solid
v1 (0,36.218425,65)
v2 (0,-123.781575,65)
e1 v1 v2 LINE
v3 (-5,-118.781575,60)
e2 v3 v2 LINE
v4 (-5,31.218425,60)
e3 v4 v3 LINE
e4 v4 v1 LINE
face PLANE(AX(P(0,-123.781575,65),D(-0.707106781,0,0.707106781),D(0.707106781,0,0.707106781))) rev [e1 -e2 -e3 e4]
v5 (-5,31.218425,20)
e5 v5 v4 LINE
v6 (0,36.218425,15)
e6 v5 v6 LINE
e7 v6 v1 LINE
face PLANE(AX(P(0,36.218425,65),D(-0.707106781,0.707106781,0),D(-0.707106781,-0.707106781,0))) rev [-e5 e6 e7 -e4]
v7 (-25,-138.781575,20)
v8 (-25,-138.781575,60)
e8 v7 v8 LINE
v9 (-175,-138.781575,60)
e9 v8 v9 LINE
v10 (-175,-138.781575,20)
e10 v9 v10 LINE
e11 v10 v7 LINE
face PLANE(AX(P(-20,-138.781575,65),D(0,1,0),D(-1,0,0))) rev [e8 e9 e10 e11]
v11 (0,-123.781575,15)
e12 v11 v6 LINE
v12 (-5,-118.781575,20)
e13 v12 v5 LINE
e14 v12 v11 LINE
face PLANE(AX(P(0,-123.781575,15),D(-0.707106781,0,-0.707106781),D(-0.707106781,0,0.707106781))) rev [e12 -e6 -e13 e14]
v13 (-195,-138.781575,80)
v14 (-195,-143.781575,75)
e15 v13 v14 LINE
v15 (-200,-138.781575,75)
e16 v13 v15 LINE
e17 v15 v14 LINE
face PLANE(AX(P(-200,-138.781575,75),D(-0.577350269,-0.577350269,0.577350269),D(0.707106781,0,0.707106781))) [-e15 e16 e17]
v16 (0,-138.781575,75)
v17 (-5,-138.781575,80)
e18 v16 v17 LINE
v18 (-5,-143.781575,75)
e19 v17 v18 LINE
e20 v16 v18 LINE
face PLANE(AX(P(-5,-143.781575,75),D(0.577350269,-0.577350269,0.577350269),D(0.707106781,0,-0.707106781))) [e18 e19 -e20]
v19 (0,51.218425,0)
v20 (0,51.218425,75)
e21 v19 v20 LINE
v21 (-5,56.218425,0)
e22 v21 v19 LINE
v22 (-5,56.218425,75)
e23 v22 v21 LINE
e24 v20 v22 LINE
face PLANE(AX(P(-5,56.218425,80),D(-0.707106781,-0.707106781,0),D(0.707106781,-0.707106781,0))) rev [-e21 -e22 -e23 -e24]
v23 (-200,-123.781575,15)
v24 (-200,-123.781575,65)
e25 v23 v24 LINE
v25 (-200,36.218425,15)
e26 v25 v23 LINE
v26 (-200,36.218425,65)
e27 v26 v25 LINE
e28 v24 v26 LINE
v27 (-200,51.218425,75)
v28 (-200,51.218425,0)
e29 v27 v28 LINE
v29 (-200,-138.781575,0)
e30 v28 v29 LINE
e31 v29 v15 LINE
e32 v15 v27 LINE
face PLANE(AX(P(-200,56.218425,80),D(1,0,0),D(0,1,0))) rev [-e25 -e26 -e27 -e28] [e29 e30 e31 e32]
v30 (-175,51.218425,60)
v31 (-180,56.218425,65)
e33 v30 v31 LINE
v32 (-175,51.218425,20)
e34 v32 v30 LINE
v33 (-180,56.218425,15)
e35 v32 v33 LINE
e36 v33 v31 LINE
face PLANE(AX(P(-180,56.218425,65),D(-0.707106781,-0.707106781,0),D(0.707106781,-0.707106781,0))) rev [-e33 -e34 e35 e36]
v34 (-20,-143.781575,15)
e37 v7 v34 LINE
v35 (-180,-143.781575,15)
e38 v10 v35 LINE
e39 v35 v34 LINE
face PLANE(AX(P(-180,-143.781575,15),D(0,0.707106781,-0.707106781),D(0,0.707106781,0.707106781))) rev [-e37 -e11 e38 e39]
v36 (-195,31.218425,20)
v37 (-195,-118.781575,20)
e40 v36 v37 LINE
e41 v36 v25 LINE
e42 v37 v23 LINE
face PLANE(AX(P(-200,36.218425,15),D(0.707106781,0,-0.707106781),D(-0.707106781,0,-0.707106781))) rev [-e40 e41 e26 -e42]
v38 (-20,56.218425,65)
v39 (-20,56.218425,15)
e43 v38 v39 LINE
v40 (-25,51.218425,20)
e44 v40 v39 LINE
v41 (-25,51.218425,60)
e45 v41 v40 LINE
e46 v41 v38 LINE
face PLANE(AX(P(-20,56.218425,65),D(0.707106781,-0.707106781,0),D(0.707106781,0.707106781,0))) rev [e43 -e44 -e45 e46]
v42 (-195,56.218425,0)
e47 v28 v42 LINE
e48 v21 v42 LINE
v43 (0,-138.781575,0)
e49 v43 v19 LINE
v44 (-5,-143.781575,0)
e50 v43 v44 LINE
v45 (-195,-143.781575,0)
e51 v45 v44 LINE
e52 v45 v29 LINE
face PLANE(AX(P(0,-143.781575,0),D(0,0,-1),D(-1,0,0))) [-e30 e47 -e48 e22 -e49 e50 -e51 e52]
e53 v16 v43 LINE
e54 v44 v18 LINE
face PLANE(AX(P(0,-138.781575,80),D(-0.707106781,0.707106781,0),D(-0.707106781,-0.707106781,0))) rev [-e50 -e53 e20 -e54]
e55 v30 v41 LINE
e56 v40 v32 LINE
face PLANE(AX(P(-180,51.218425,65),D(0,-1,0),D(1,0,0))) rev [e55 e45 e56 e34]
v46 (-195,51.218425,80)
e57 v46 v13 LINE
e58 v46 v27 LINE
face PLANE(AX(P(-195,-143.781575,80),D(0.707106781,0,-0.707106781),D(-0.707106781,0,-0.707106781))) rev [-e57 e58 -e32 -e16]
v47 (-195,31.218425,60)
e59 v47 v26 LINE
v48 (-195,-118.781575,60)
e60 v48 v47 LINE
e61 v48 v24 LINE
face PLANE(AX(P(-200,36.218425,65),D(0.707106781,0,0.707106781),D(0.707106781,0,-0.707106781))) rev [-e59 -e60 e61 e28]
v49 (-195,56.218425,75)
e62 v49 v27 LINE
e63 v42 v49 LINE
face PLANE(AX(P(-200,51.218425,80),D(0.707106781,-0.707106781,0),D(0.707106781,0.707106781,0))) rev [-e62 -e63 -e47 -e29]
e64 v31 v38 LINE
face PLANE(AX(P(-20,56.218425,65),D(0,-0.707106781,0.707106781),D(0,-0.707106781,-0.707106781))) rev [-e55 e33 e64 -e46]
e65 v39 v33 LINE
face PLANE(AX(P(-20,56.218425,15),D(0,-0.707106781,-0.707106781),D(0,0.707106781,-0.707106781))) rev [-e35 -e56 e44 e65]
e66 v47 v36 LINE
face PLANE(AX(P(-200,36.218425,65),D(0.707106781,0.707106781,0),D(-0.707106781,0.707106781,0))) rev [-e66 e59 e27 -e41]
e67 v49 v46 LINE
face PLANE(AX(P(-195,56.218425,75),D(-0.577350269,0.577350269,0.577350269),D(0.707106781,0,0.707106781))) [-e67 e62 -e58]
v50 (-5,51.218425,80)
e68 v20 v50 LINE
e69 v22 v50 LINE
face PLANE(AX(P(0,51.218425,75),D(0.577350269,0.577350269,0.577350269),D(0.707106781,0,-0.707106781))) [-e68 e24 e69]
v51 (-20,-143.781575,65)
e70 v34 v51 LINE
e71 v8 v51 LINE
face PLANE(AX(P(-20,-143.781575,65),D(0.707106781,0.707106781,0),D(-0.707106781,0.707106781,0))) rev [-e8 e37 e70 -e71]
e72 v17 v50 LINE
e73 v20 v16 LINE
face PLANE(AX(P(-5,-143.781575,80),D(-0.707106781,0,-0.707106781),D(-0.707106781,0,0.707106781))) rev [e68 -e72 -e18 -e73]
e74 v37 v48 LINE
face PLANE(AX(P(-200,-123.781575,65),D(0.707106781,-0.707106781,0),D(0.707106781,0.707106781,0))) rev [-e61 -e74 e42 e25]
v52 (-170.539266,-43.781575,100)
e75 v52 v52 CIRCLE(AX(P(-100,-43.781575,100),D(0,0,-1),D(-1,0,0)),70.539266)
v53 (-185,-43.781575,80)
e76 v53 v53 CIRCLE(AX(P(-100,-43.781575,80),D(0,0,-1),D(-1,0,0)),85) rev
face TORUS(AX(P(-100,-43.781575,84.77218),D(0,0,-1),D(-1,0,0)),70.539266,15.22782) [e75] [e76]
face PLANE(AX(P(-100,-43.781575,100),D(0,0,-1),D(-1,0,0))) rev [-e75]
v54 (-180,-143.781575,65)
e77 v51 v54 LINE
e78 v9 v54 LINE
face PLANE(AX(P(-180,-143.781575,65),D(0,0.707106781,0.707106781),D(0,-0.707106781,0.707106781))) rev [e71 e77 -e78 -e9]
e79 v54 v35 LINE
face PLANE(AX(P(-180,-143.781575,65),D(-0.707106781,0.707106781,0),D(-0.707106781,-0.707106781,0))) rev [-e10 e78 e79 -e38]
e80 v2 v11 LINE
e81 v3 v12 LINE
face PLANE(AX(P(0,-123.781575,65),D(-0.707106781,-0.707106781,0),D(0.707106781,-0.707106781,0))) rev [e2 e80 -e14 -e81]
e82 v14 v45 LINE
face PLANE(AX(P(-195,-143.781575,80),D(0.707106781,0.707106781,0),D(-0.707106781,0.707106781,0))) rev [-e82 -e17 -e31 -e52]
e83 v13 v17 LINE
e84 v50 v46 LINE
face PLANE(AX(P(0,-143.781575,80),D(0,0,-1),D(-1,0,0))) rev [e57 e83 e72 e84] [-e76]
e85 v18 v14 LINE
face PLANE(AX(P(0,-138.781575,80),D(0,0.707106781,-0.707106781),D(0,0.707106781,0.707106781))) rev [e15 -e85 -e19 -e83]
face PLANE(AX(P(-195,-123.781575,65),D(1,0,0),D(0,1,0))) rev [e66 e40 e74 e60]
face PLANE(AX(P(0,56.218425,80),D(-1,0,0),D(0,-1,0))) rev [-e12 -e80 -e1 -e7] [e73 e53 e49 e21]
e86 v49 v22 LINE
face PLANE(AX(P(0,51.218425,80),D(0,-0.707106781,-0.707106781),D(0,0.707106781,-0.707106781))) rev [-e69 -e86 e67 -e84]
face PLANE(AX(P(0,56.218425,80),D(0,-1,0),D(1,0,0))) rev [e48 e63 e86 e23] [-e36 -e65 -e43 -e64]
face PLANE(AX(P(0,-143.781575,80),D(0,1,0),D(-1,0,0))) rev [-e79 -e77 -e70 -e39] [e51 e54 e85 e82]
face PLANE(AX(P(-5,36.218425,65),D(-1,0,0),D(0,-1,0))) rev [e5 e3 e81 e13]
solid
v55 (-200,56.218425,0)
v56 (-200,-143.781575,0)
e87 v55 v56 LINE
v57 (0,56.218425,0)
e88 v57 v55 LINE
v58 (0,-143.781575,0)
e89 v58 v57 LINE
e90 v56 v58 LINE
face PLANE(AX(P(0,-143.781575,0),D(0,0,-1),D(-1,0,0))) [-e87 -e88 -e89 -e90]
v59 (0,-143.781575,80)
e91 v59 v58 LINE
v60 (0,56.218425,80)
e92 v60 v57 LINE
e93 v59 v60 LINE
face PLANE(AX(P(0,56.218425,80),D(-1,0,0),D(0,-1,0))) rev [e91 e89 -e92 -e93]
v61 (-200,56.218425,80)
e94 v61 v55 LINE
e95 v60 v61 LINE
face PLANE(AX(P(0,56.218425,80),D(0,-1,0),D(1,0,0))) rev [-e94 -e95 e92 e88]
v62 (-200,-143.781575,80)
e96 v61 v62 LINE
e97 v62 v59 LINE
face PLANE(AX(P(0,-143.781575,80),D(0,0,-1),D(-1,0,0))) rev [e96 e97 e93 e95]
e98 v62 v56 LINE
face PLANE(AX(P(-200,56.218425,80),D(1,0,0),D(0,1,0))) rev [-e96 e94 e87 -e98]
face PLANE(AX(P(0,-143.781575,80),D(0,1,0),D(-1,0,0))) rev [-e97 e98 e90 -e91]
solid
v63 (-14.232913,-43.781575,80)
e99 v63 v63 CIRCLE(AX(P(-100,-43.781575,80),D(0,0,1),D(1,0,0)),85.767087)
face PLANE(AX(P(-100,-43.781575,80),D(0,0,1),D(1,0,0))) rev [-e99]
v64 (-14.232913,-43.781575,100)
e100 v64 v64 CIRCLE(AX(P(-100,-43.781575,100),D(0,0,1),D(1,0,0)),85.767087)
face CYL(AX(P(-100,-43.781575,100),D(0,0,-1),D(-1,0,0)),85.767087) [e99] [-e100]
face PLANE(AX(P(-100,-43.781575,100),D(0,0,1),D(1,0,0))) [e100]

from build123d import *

# Parameters (mm, degrees)
SCHIZZO2_W                            = 200
SCHIZZO2_H                            = 200
ESTRUSIONE_ESTRUSIONE1_DEPTH          = 80
CORPO_SPOSTA_COPIA1_START             = -200
CORPO_SPOSTA_COPIA1_OUTLINE_W         = 200
CORPO_SPOSTA_COPIA1_OUTLINE_H         = 80
CORPO_SPOSTA_COPIA1_DEPTH             = 200
SCHIZZO5_W                            = 50
SCHIZZO5_H                            = 160
TAGLIO_ESTRUSIONE1_DEPTH              = 5
TAGLIO_ESTRUSIONE1_DRAFT              = -45
RIPETIZIONECIRCOLARE2_COPY_1_SKETCH_W = 50
RIPETIZIONECIRCOLARE2_COPY_1_SKETCH_H = 160
RIPETIZIONECIRCOLARE2_COPY_1_DEPTH    = 5
RIPETIZIONECIRCOLARE2_COPY_1_DRAFT    = -45
RIPETIZIONECIRCOLARE2_COPY_2_SKETCH_W = 50
RIPETIZIONECIRCOLARE2_COPY_2_SKETCH_H = 160
RIPETIZIONECIRCOLARE2_COPY_2_DEPTH    = 5
RIPETIZIONECIRCOLARE2_COPY_2_DRAFT    = -45
RIPETIZIONECIRCOLARE2_COPY_3_SKETCH_W = 50
RIPETIZIONECIRCOLARE2_COPY_3_SKETCH_H = 160
RIPETIZIONECIRCOLARE2_COPY_3_DEPTH    = 5
RIPETIZIONECIRCOLARE2_COPY_3_DRAFT    = -45
SMUSSO1_SIZE                          = 5
SCHIZZO7_R                            = 85.767086788
ESTRUSIONE_ESTRUSIONE2_DEPTH          = 20


# Read off the part's stored shape, not the designer's step: Corpo-Sposta/copia1
with BuildPart() as part:
    # Schizzo2 → Estrusione-Estrusione1 (new body)
    with BuildSketch(Plane.XY):
        with Locations((-100, -43.781574918)):
            Rectangle(SCHIZZO2_W, SCHIZZO2_H)
    extrude(amount=ESTRUSIONE_ESTRUSIONE1_DEPTH)

    # Schizzo4 → Rivoluzione3 (revolve)
    with BuildSketch(Plane(origin=(0, -43.781574918, 0), x_dir=(-1, 0, 0), z_dir=(0, 1, 0)), mode=Mode.PRIVATE) as rivoluzione3_sk:
        with BuildLine():
            Line((100, 100), (29.460733668, 100))
            ThreePointArc((29.460733668, 100), (17.120628135, 93.694528522), (15, 80))
            Line((15, 80), (100, 80))
            Line((100, 80), (100, 100))
        make_face()
    revolve(rivoluzione3_sk.sketch.rotate(Axis((-100, -43.781574918, 80), (0, 0, 1)), 180), axis=Axis((-100, -43.781574918, 80), (0, 0, 1)))


with BuildPart() as body_2:
    # Corpo-Sposta/copia1 outline → Corpo-Sposta/copia1 (new body)
    with BuildSketch(Plane.YZ.offset(CORPO_SPOSTA_COPIA1_START)):
        with Locations((-43.781574918, 40)):
            Rectangle(CORPO_SPOSTA_COPIA1_OUTLINE_W, CORPO_SPOSTA_COPIA1_OUTLINE_H)
    extrude(amount=CORPO_SPOSTA_COPIA1_DEPTH)


with BuildPart() as taglio_estrusione1_tool:
    # Schizzo5 → Taglio-Estrusione1 (with draft: the straight prism first)
    with BuildSketch(Plane(origin=(0, 0, 0), x_dir=(0, 0, -1), z_dir=(1, 0, 0))):
        with Locations((-40, -43.781574918)):
            Rectangle(SCHIZZO5_W, SCHIZZO5_H)
    extrude(amount=-TAGLIO_ESTRUSIONE1_DEPTH)
    # Taglio-Estrusione1: the draft: its side faces are tilted about the plane it starts from
    taglio_estrusione1_sides = [taglio_estrusione1_tool.faces().sort_by_distance(p)[0] for p in [
        (-2.5, -123.781574918, 40),
        (-2.5, -43.781574918, 15),
        (-2.5, 36.218425082, 40),
        (-2.5, -43.781574918, 65),
    ]]
    draft(taglio_estrusione1_sides, Plane(origin=(0, 0, 0), x_dir=(0, 0, -1), z_dir=(1, 0, 0)), TAGLIO_ESTRUSIONE1_DRAFT)


with BuildPart() as part_1:
    add(part.part)

    # Taglio-Estrusione1: cut by taglio_estrusione1_tool
    add(taglio_estrusione1_tool.part, mode=Mode.SUBTRACT)


with BuildPart() as ripetizionecircolare2_copy_1_tool:
    # RipetizioneCircolare2 copy 1 sketch → RipetizioneCircolare2 copy 1 (with draft: the straight prism first)
    with BuildSketch(Plane(origin=(-143.781574918, 56.218425082, 0), x_dir=(0, 0, -1), z_dir=(0, 1, 0))):
        with Locations((-40, -43.781574918)):
            Rectangle(RIPETIZIONECIRCOLARE2_COPY_1_SKETCH_W, RIPETIZIONECIRCOLARE2_COPY_1_SKETCH_H)
    extrude(amount=-RIPETIZIONECIRCOLARE2_COPY_1_DEPTH)
    # RipetizioneCircolare2 copy 1: the draft: its side faces are tilted about the plane it starts from
    ripetizionecircolare2_copy_1_sides = [ripetizionecircolare2_copy_1_tool.faces().sort_by_distance(p)[0] for p in [
        (-20, 53.718425082, 40),
        (-100, 53.718425082, 15),
        (-180, 53.718425082, 40),
        (-100, 53.718425082, 65),
    ]]
    draft(ripetizionecircolare2_copy_1_sides, Plane(origin=(-143.781574918, 56.218425082, 0), x_dir=(0, 0, -1), z_dir=(0, 1, 0)), RIPETIZIONECIRCOLARE2_COPY_1_DRAFT)


with BuildPart() as part_2:
    add(part_1.part)

    # RipetizioneCircolare2 copy 1: cut by ripetizionecircolare2_copy_1_tool
    add(ripetizionecircolare2_copy_1_tool.part, mode=Mode.SUBTRACT)


with BuildPart() as ripetizionecircolare2_copy_2_tool:
    # RipetizioneCircolare2 copy 2 sketch → RipetizioneCircolare2 copy 2 (with draft: the straight prism first)
    with BuildSketch(Plane(origin=(-200, -87.563149837, 0), x_dir=(0, 0, -1), z_dir=(-1, 0, 0))):
        with Locations((-40, -43.781574918)):
            Rectangle(RIPETIZIONECIRCOLARE2_COPY_2_SKETCH_W, RIPETIZIONECIRCOLARE2_COPY_2_SKETCH_H)
    extrude(amount=-RIPETIZIONECIRCOLARE2_COPY_2_DEPTH)
    # RipetizioneCircolare2 copy 2: the draft: its side faces are tilted about the plane it starts from
    ripetizionecircolare2_copy_2_sides = [ripetizionecircolare2_copy_2_tool.faces().sort_by_distance(p)[0] for p in [
        (-197.5, 36.218425081, 40),
        (-197.5, -43.781574919, 15),
        (-197.5, -123.781574919, 40),
        (-197.5, -43.781574919, 65),
    ]]
    draft(ripetizionecircolare2_copy_2_sides, Plane(origin=(-200, -87.563149837, 0), x_dir=(0, 0, -1), z_dir=(-1, 0, 0)), RIPETIZIONECIRCOLARE2_COPY_2_DRAFT)


with BuildPart() as part_3:
    add(part_2.part)

    # RipetizioneCircolare2 copy 2: cut by ripetizionecircolare2_copy_2_tool
    add(ripetizionecircolare2_copy_2_tool.part, mode=Mode.SUBTRACT)


with BuildPart() as ripetizionecircolare2_copy_3_tool:
    # RipetizioneCircolare2 copy 3 sketch → RipetizioneCircolare2 copy 3 (with draft: the straight prism first)
    with BuildSketch(Plane(origin=(-56.218425082, -143.781574918, 0), x_dir=(0, 0, -1), z_dir=(0, -1, 0))):
        with Locations((-40, -43.781574918)):
            Rectangle(RIPETIZIONECIRCOLARE2_COPY_3_SKETCH_W, RIPETIZIONECIRCOLARE2_COPY_3_SKETCH_H)
    extrude(amount=-RIPETIZIONECIRCOLARE2_COPY_3_DEPTH)
    # RipetizioneCircolare2 copy 3: the draft: its side faces are tilted about the plane it starts from
    ripetizionecircolare2_copy_3_sides = [ripetizionecircolare2_copy_3_tool.faces().sort_by_distance(p)[0] for p in [
        (-180, -141.281574918, 40),
        (-100, -141.281574918, 15),
        (-20, -141.281574918, 40),
        (-100, -141.281574918, 65),
    ]]
    draft(ripetizionecircolare2_copy_3_sides, Plane(origin=(-56.218425082, -143.781574918, 0), x_dir=(0, 0, -1), z_dir=(0, -1, 0)), RIPETIZIONECIRCOLARE2_COPY_3_DRAFT)


with BuildPart() as part_4:
    add(part_3.part)

    # RipetizioneCircolare2 copy 3: cut by ripetizionecircolare2_copy_3_tool
    add(ripetizionecircolare2_copy_3_tool.part, mode=Mode.SUBTRACT)

    # Smusso1
    smusso1_edges = [part_4.edges().sort_by_distance(p)[0] for p in [
        (-200, -43.781574918, 80),
        (-100, -143.781574918, 80),
        (0, -43.781574918, 80),
        (-100, 56.218425082, 80),
        (0, -143.781574918, 40),
        (-200, -143.781574918, 40),
        (-200, 56.218425082, 40),
        (0, 56.218425082, 40),
    ]]
    chamfer(smusso1_edges, length=SMUSSO1_SIZE)


with BuildPart() as body_3:
    # Schizzo7 → Estrusione-Estrusione2 (new body)
    with BuildSketch(Plane.XY.offset(80)):
        with Locations((-100, -43.781574918)):
            Circle(SCHIZZO7_R)
    extrude(amount=ESTRUSIONE_ESTRUSIONE2_DEPTH)


solid = Compound([body_2.part, part_4.part, body_3.part])
